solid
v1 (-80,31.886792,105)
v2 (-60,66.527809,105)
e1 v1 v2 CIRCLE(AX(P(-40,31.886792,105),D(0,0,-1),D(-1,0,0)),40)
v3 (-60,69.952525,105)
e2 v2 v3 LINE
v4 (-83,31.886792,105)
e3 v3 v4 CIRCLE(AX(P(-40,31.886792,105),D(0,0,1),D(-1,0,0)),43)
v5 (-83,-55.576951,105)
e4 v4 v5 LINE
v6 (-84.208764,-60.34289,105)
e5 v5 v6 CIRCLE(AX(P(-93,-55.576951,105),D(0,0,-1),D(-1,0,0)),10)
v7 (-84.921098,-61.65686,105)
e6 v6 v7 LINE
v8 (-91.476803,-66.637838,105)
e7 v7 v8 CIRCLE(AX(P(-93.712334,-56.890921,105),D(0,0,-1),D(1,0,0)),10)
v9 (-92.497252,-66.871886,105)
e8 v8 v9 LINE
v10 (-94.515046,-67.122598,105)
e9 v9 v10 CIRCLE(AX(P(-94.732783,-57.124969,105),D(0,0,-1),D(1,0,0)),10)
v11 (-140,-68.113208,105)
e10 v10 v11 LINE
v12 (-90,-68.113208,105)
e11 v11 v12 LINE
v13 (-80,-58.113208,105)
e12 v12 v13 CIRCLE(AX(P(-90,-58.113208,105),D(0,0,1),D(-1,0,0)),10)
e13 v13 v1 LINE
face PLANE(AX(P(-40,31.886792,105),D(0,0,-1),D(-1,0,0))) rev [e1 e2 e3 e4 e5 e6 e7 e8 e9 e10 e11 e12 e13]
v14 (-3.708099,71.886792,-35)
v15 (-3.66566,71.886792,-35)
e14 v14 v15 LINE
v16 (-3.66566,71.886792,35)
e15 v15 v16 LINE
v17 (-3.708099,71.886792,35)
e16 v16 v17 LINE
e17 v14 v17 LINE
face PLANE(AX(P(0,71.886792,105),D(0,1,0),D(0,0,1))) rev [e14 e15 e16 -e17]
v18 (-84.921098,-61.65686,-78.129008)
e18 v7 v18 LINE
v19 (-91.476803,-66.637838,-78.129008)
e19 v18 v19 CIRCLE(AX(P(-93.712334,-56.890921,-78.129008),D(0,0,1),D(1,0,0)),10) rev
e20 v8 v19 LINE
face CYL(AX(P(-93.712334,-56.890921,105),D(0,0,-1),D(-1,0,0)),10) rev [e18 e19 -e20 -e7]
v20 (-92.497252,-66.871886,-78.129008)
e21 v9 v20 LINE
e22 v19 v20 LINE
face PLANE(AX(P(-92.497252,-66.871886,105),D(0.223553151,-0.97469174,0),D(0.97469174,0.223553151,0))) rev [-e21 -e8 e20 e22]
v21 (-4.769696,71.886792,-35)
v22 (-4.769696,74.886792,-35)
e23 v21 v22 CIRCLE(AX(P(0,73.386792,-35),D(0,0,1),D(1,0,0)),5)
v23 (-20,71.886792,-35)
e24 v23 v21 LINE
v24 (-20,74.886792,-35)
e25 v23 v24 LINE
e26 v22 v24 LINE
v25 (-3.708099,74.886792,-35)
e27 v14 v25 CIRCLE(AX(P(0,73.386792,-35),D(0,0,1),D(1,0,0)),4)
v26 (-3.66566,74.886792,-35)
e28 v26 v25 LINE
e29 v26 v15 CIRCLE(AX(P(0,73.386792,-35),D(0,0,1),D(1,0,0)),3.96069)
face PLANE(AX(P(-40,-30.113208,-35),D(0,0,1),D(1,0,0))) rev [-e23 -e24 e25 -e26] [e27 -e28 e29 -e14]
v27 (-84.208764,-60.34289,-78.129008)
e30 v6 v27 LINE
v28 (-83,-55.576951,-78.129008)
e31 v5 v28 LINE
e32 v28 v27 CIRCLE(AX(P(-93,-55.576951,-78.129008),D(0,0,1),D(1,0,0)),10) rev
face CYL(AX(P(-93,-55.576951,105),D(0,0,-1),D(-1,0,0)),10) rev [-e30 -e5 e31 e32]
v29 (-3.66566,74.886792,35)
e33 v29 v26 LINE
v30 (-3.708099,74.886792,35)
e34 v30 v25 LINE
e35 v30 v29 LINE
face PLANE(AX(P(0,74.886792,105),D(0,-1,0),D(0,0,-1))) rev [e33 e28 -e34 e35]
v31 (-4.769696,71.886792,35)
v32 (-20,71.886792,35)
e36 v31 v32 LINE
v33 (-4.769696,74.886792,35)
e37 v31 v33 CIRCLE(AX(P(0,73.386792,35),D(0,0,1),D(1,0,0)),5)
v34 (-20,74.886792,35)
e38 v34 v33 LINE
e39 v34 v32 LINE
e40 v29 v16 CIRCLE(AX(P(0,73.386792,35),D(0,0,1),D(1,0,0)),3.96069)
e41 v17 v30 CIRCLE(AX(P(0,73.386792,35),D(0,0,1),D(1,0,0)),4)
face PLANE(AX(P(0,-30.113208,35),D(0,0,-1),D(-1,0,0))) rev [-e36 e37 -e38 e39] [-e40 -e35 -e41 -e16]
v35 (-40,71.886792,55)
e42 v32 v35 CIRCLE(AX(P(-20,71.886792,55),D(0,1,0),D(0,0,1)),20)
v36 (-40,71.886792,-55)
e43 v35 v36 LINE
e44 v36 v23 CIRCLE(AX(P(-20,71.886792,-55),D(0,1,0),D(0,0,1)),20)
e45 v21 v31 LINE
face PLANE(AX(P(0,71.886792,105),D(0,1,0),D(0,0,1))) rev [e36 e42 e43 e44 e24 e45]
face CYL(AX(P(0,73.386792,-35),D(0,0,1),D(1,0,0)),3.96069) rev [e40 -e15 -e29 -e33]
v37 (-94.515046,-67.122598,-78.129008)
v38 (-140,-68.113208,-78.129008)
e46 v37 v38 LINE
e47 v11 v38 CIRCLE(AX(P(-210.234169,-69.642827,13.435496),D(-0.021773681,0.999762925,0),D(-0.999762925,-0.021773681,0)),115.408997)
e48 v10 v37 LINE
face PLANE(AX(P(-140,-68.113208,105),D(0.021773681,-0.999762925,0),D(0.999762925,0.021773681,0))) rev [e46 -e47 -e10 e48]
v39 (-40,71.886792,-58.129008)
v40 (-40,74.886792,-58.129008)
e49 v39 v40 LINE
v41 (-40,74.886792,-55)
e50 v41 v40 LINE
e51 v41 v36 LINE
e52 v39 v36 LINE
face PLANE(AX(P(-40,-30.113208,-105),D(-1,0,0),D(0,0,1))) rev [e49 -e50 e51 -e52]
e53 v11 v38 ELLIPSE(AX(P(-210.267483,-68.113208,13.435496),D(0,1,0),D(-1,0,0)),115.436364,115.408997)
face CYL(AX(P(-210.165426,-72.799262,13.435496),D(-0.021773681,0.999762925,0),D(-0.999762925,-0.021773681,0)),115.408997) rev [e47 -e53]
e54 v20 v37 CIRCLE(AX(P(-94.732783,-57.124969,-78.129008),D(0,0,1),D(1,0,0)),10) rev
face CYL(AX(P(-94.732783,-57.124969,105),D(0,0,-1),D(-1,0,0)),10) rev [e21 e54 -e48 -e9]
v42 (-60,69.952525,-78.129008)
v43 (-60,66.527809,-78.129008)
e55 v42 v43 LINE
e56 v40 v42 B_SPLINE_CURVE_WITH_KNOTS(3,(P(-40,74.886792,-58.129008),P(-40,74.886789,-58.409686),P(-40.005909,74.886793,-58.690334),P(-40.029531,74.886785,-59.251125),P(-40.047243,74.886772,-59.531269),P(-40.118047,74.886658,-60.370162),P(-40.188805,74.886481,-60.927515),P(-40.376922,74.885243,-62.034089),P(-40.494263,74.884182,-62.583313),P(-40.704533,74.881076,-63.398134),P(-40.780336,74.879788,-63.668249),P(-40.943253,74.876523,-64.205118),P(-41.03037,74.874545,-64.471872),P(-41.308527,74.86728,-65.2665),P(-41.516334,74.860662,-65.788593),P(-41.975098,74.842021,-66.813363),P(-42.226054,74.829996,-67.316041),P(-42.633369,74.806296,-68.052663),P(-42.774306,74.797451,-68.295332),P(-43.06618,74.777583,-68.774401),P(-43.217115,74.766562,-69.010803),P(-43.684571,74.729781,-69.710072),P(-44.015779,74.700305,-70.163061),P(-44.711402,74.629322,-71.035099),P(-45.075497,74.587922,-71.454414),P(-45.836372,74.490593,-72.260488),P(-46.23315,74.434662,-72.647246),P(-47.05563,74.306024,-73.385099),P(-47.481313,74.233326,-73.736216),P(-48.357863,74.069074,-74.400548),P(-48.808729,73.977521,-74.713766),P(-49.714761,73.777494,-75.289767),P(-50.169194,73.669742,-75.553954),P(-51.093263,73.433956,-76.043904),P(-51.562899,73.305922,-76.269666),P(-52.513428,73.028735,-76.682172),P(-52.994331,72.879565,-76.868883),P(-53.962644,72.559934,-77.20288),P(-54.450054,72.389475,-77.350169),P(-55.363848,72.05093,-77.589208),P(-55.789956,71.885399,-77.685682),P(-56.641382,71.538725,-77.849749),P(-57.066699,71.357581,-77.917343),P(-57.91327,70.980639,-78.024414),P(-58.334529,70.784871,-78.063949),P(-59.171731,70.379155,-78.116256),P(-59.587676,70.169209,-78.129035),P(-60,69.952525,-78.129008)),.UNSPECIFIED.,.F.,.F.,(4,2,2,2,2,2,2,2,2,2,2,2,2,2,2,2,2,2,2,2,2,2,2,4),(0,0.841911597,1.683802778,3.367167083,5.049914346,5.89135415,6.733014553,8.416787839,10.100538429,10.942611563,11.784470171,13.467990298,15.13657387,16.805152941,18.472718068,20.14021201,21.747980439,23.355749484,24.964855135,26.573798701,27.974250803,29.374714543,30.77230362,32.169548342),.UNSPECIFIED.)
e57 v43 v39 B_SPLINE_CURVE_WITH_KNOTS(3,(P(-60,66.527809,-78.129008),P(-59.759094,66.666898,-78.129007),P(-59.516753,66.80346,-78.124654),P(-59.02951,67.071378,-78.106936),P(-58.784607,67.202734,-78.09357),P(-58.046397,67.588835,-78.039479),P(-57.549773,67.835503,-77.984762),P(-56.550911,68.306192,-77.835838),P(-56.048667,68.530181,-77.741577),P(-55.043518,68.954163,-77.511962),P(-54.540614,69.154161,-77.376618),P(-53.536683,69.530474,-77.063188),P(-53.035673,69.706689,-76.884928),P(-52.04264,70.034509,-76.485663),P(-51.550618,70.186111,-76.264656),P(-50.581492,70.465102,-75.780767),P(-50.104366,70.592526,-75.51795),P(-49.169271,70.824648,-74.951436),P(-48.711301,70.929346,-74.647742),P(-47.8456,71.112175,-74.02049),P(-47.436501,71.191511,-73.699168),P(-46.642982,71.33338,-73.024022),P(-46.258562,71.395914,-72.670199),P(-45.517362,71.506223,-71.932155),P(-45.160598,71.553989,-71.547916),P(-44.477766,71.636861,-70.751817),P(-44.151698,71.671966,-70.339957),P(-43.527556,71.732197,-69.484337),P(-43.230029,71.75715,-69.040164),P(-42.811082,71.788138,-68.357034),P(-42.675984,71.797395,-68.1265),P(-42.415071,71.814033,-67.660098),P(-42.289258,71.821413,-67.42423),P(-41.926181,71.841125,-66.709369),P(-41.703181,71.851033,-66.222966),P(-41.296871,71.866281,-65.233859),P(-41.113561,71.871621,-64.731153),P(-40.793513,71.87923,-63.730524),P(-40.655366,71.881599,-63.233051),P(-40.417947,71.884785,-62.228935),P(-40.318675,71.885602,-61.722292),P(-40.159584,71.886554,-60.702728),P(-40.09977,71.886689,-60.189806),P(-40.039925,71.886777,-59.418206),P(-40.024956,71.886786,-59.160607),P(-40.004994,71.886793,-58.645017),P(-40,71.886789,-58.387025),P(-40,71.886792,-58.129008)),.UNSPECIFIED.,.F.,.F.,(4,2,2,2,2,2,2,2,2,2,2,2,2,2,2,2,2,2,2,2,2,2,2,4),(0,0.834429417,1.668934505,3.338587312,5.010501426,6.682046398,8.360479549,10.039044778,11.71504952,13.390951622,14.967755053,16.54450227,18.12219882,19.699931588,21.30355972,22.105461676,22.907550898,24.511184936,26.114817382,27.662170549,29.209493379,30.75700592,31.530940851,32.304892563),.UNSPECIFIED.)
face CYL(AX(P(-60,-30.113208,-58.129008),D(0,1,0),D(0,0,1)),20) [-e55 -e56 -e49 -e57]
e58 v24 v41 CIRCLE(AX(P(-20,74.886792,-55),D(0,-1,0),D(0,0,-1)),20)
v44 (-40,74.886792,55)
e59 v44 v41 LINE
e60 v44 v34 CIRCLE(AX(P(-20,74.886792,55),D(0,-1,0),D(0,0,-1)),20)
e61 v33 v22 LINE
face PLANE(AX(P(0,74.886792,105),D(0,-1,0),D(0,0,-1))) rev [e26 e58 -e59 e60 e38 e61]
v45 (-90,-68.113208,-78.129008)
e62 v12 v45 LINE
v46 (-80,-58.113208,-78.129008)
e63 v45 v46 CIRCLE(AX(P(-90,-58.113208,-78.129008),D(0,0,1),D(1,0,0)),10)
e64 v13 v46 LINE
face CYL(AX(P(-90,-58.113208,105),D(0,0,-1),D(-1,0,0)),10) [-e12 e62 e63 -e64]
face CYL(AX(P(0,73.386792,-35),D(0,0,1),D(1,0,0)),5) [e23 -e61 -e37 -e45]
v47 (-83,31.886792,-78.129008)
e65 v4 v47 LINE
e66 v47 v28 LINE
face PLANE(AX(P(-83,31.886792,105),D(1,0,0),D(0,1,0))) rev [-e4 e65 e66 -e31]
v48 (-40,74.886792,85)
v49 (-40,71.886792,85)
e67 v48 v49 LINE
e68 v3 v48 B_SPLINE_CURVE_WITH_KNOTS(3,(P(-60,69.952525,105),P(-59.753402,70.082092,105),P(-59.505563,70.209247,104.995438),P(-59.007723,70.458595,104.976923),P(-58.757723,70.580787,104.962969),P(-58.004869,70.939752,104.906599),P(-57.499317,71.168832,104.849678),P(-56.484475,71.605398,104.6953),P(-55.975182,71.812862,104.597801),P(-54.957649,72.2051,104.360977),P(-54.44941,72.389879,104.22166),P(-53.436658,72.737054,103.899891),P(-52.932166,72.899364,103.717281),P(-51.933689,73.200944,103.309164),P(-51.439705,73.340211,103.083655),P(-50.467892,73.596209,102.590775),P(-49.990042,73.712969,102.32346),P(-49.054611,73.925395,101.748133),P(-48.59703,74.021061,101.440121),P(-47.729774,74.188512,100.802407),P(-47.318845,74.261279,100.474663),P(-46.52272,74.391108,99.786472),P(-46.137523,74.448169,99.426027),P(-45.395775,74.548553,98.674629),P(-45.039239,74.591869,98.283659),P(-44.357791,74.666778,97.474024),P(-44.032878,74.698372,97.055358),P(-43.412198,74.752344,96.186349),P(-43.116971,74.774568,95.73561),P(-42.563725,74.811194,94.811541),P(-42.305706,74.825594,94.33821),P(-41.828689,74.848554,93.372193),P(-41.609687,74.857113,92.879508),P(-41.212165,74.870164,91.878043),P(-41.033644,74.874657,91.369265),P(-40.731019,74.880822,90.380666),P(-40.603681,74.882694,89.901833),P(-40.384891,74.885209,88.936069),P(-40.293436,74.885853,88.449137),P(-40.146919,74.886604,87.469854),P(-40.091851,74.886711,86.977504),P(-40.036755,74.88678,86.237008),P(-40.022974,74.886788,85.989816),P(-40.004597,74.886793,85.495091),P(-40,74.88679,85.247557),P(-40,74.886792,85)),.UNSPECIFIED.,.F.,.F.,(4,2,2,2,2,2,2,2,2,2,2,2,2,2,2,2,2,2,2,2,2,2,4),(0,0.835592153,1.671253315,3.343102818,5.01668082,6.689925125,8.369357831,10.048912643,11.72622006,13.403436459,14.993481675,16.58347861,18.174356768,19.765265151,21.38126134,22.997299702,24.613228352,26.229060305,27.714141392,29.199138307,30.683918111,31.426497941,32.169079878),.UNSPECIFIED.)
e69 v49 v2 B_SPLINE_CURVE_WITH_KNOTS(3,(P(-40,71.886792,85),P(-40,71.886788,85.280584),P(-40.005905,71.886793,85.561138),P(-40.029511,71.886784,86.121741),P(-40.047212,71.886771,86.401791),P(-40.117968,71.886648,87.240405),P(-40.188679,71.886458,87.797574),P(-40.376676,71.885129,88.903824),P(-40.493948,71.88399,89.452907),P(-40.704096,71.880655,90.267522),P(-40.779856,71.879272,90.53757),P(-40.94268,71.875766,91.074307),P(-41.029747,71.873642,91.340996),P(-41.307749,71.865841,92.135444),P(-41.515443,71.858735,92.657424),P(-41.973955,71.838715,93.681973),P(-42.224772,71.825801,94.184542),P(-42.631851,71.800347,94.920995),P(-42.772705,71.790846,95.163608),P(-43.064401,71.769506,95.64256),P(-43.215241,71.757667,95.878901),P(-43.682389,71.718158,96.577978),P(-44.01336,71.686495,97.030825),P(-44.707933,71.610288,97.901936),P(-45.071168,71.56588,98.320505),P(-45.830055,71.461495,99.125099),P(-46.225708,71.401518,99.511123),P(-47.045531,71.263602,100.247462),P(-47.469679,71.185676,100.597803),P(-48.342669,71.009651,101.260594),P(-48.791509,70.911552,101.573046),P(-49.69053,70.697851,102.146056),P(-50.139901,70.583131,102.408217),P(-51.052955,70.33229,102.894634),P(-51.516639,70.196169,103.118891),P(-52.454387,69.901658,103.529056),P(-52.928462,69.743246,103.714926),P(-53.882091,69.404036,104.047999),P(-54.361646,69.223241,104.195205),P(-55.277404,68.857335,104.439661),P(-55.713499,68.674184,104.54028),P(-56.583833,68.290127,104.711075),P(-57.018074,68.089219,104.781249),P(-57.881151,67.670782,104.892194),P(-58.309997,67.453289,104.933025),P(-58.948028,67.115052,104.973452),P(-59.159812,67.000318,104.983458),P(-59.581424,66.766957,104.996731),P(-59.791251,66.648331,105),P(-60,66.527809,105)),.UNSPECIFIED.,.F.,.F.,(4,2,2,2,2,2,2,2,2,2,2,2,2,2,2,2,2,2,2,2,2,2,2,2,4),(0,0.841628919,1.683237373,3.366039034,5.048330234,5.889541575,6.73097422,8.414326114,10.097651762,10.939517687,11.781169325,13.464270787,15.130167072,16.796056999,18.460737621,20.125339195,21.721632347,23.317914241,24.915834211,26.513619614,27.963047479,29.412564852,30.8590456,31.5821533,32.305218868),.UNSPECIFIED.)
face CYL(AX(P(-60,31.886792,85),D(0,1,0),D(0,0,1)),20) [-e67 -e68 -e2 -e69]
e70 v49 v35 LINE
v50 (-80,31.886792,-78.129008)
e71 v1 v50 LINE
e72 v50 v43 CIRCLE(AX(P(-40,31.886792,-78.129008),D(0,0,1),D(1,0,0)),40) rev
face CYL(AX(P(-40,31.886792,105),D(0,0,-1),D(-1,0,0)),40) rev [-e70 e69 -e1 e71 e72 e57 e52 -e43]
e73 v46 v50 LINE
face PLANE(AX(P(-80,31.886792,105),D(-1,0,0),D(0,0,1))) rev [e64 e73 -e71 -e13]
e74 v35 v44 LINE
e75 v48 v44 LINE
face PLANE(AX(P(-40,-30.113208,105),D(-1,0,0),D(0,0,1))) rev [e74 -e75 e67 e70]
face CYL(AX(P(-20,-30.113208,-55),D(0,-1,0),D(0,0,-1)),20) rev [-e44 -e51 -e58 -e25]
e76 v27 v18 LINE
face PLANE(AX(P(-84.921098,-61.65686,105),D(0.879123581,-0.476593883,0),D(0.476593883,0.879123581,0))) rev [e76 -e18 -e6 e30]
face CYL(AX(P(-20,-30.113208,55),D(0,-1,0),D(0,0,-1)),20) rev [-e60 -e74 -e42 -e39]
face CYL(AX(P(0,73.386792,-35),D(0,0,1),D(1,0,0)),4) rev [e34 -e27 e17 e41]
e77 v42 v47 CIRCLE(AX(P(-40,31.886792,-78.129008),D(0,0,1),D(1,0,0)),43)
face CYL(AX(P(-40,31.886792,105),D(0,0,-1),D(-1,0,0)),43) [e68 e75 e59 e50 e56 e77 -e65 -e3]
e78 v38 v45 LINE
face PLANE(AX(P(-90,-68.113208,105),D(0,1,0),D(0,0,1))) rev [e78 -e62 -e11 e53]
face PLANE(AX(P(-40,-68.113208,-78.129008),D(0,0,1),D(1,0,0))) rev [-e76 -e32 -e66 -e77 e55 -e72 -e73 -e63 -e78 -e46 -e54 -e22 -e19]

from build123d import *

# Parameters (mm, degrees)
BOSS_EXTRUDE2_DEPTH = 105
SKETCH2_W           = 40
SKETCH2_H           = 70
CUT_EXTRUDE1_DEPTH  = 105
FILLET1_R           = 20
FILLET2_R           = 20
SKETCH3_R           = 5
SKETCH3_R_2         = 4
BOSS_EXTRUDE3_DEPTH = 70
SKETCH4_R           = 3.960689981
CUT_EXTRUDE2_DEPTH  = 70
SKETCH5_W           = 109.66717185
SKETCH5_H           = 31.212047829
CUT_EXTRUDE3_DEPTH  = 226.995575224
FILLET3_R           = 20
CUT_EXTRUDE4_DEPTH  = 228.140735518


with BuildPart() as part:
    # Sketch1 → Boss-Extrude2 (new, symmetric)
    with BuildSketch(Plane.XY):
        with BuildLine():
            Line((0, 71.886792453), (-40, 71.886792453))
            ThreePointArc((-40, 71.886792453), (-68.284271247, 60.1710637), (-80, 31.886792453))
            Line((-80, 31.886792453), (-80, -58.113207547))
            ThreePointArc((-80, -58.113207547), (-82.928932188, -65.184275359), (-90, -68.113207547))
            Line((-90, -68.113207547), (-140, -68.113207547))
            Line((-140, -68.113207547), (-94.515046268, -67.122597845))
            ThreePointArc((-94.515046268, -67.122597845), (-93.499760174, -67.04866017), (-92.497251559, -66.871885994))
            Line((-92.497251559, -66.871885994), (-91.47680263, -66.637838075))
            ThreePointArc((-91.47680263, -66.637838075), (-87.662546027, -64.853336369), (-84.921098336, -61.656859506))
            Line((-84.921098336, -61.656859506), (-84.208764192, -60.34289018))
            ThreePointArc((-84.208764192, -60.34289018), (-83.306900442, -58.035369732), (-83, -55.576951347))
            Line((-83, -55.576951347), (-83, 31.886792453))
            ThreePointArc((-83, 31.886792453), (-70.405591591, 62.292384044), (-40, 74.886792453))
            Line((-40, 74.886792453), (0, 74.886792453))
            Line((0, 74.886792453), (0, 71.886792453))
        make_face()
    extrude(amount=BOSS_EXTRUDE2_DEPTH, both=True)

    # Sketch2 → Cut-Extrude1 (cut, symmetric)
    with BuildSketch(Plane(origin=(0, 74.886792453, 0), x_dir=(1, 0, 0), z_dir=(0, 1, 0))):
        with Locations((-20, 70)):
            Rectangle(SKETCH2_W, SKETCH2_H)
        with Locations((-20, -70)):
            Rectangle(SKETCH2_W, SKETCH2_H)
    extrude(amount=CUT_EXTRUDE1_DEPTH, both=True, mode=Mode.SUBTRACT)

    # Fillet1
    fillet1_edges = [part.edges().sort_by_distance(p)[0] for p in [
        (-40, 73.386792453, -35),
        (-40, 73.386792453, 35),
    ]]
    fillet(fillet1_edges, radius=FILLET1_R)

    # Fillet2
    # the kernel refuses this fillet: 20 mm, written as the material it takes off along each edge
    with BuildSketch(Plane(origin=(-40, 21.886792453, -105), x_dir=(-1, 0, 0), z_dir=(0, 1, 0)), Plane(origin=(-40, 124.886792453, 105), x_dir=(-1, 0, 0), z_dir=(0, -1, 0))) as fillet2_piece_1:
        with BuildLine():
            CenterArc((FILLET2_R, FILLET2_R), FILLET2_R, 180, 90)
            Line((0, FILLET2_R), (0, 0))
            Line((0, 0), (FILLET2_R, 0))
        make_face()
    extrude(amount=103, mode=Mode.SUBTRACT)

    # Sketch3 → Boss-Extrude3 (add)
    with BuildSketch(Plane.XY.offset(35)):
        with Locations((0, 73.386792453)):
            Circle(SKETCH3_R)
        with Locations((0, 73.386792453)):
            Circle(SKETCH3_R_2, mode=Mode.SUBTRACT)
    extrude(amount=-BOSS_EXTRUDE3_DEPTH)

    # Sketch4 → Cut-Extrude2 (cut)
    with BuildSketch(Plane.XY.offset(35)):
        with Locations((0, 73.386792453)):
            Circle(SKETCH4_R)
    extrude(amount=-CUT_EXTRUDE2_DEPTH, mode=Mode.SUBTRACT)

    # Sketch5 → Cut-Extrude3 (cut, through all)
    with BuildSketch(Plane(origin=(0, 74.886792453, 0), x_dir=(1, 0, 0), z_dir=(0, 1, 0))):
        with Locations((-94.833585925, 93.735031647)):
            Rectangle(SKETCH5_W, SKETCH5_H)
    extrude(amount=-CUT_EXTRUDE3_DEPTH, mode=Mode.SUBTRACT)

    # Fillet3
    # the kernel refuses this fillet: 20 mm, written as the material it takes off along each edge
    with BuildSketch(Plane(origin=(-40, 124.886792453, -78.129007732), x_dir=(-1, 0, 0), z_dir=(0, -1, 0))) as fillet3_piece_1:
        with BuildLine():
            CenterArc((FILLET3_R, -FILLET3_R), FILLET3_R, 90, 90)
            Line((0, -FILLET3_R), (0, 0))
            Line((0, 0), (FILLET3_R, 0))
        make_face()
    extrude(amount=103, mode=Mode.SUBTRACT)

    # Sketch6 → Cut-Extrude4 (cut, through all)
    with BuildSketch(Plane(origin=(1.416350581, -65.033322939, 0), x_dir=(0.9997629253149604, 0.021773680572498965, 0), z_dir=(-0.021773680572498965, 0.9997629253149604, 0))):
        with BuildLine():
            Line((-141.449884768, 78.129007732), (-141.449884768, -105))
            ThreePointArc((-141.449884768, -105), (-96.291711515, -13.435496134), (-141.449884768, 78.129007732))
        make_face()
    extrude(amount=-CUT_EXTRUDE4_DEPTH, mode=Mode.SUBTRACT)


solid = part.part
